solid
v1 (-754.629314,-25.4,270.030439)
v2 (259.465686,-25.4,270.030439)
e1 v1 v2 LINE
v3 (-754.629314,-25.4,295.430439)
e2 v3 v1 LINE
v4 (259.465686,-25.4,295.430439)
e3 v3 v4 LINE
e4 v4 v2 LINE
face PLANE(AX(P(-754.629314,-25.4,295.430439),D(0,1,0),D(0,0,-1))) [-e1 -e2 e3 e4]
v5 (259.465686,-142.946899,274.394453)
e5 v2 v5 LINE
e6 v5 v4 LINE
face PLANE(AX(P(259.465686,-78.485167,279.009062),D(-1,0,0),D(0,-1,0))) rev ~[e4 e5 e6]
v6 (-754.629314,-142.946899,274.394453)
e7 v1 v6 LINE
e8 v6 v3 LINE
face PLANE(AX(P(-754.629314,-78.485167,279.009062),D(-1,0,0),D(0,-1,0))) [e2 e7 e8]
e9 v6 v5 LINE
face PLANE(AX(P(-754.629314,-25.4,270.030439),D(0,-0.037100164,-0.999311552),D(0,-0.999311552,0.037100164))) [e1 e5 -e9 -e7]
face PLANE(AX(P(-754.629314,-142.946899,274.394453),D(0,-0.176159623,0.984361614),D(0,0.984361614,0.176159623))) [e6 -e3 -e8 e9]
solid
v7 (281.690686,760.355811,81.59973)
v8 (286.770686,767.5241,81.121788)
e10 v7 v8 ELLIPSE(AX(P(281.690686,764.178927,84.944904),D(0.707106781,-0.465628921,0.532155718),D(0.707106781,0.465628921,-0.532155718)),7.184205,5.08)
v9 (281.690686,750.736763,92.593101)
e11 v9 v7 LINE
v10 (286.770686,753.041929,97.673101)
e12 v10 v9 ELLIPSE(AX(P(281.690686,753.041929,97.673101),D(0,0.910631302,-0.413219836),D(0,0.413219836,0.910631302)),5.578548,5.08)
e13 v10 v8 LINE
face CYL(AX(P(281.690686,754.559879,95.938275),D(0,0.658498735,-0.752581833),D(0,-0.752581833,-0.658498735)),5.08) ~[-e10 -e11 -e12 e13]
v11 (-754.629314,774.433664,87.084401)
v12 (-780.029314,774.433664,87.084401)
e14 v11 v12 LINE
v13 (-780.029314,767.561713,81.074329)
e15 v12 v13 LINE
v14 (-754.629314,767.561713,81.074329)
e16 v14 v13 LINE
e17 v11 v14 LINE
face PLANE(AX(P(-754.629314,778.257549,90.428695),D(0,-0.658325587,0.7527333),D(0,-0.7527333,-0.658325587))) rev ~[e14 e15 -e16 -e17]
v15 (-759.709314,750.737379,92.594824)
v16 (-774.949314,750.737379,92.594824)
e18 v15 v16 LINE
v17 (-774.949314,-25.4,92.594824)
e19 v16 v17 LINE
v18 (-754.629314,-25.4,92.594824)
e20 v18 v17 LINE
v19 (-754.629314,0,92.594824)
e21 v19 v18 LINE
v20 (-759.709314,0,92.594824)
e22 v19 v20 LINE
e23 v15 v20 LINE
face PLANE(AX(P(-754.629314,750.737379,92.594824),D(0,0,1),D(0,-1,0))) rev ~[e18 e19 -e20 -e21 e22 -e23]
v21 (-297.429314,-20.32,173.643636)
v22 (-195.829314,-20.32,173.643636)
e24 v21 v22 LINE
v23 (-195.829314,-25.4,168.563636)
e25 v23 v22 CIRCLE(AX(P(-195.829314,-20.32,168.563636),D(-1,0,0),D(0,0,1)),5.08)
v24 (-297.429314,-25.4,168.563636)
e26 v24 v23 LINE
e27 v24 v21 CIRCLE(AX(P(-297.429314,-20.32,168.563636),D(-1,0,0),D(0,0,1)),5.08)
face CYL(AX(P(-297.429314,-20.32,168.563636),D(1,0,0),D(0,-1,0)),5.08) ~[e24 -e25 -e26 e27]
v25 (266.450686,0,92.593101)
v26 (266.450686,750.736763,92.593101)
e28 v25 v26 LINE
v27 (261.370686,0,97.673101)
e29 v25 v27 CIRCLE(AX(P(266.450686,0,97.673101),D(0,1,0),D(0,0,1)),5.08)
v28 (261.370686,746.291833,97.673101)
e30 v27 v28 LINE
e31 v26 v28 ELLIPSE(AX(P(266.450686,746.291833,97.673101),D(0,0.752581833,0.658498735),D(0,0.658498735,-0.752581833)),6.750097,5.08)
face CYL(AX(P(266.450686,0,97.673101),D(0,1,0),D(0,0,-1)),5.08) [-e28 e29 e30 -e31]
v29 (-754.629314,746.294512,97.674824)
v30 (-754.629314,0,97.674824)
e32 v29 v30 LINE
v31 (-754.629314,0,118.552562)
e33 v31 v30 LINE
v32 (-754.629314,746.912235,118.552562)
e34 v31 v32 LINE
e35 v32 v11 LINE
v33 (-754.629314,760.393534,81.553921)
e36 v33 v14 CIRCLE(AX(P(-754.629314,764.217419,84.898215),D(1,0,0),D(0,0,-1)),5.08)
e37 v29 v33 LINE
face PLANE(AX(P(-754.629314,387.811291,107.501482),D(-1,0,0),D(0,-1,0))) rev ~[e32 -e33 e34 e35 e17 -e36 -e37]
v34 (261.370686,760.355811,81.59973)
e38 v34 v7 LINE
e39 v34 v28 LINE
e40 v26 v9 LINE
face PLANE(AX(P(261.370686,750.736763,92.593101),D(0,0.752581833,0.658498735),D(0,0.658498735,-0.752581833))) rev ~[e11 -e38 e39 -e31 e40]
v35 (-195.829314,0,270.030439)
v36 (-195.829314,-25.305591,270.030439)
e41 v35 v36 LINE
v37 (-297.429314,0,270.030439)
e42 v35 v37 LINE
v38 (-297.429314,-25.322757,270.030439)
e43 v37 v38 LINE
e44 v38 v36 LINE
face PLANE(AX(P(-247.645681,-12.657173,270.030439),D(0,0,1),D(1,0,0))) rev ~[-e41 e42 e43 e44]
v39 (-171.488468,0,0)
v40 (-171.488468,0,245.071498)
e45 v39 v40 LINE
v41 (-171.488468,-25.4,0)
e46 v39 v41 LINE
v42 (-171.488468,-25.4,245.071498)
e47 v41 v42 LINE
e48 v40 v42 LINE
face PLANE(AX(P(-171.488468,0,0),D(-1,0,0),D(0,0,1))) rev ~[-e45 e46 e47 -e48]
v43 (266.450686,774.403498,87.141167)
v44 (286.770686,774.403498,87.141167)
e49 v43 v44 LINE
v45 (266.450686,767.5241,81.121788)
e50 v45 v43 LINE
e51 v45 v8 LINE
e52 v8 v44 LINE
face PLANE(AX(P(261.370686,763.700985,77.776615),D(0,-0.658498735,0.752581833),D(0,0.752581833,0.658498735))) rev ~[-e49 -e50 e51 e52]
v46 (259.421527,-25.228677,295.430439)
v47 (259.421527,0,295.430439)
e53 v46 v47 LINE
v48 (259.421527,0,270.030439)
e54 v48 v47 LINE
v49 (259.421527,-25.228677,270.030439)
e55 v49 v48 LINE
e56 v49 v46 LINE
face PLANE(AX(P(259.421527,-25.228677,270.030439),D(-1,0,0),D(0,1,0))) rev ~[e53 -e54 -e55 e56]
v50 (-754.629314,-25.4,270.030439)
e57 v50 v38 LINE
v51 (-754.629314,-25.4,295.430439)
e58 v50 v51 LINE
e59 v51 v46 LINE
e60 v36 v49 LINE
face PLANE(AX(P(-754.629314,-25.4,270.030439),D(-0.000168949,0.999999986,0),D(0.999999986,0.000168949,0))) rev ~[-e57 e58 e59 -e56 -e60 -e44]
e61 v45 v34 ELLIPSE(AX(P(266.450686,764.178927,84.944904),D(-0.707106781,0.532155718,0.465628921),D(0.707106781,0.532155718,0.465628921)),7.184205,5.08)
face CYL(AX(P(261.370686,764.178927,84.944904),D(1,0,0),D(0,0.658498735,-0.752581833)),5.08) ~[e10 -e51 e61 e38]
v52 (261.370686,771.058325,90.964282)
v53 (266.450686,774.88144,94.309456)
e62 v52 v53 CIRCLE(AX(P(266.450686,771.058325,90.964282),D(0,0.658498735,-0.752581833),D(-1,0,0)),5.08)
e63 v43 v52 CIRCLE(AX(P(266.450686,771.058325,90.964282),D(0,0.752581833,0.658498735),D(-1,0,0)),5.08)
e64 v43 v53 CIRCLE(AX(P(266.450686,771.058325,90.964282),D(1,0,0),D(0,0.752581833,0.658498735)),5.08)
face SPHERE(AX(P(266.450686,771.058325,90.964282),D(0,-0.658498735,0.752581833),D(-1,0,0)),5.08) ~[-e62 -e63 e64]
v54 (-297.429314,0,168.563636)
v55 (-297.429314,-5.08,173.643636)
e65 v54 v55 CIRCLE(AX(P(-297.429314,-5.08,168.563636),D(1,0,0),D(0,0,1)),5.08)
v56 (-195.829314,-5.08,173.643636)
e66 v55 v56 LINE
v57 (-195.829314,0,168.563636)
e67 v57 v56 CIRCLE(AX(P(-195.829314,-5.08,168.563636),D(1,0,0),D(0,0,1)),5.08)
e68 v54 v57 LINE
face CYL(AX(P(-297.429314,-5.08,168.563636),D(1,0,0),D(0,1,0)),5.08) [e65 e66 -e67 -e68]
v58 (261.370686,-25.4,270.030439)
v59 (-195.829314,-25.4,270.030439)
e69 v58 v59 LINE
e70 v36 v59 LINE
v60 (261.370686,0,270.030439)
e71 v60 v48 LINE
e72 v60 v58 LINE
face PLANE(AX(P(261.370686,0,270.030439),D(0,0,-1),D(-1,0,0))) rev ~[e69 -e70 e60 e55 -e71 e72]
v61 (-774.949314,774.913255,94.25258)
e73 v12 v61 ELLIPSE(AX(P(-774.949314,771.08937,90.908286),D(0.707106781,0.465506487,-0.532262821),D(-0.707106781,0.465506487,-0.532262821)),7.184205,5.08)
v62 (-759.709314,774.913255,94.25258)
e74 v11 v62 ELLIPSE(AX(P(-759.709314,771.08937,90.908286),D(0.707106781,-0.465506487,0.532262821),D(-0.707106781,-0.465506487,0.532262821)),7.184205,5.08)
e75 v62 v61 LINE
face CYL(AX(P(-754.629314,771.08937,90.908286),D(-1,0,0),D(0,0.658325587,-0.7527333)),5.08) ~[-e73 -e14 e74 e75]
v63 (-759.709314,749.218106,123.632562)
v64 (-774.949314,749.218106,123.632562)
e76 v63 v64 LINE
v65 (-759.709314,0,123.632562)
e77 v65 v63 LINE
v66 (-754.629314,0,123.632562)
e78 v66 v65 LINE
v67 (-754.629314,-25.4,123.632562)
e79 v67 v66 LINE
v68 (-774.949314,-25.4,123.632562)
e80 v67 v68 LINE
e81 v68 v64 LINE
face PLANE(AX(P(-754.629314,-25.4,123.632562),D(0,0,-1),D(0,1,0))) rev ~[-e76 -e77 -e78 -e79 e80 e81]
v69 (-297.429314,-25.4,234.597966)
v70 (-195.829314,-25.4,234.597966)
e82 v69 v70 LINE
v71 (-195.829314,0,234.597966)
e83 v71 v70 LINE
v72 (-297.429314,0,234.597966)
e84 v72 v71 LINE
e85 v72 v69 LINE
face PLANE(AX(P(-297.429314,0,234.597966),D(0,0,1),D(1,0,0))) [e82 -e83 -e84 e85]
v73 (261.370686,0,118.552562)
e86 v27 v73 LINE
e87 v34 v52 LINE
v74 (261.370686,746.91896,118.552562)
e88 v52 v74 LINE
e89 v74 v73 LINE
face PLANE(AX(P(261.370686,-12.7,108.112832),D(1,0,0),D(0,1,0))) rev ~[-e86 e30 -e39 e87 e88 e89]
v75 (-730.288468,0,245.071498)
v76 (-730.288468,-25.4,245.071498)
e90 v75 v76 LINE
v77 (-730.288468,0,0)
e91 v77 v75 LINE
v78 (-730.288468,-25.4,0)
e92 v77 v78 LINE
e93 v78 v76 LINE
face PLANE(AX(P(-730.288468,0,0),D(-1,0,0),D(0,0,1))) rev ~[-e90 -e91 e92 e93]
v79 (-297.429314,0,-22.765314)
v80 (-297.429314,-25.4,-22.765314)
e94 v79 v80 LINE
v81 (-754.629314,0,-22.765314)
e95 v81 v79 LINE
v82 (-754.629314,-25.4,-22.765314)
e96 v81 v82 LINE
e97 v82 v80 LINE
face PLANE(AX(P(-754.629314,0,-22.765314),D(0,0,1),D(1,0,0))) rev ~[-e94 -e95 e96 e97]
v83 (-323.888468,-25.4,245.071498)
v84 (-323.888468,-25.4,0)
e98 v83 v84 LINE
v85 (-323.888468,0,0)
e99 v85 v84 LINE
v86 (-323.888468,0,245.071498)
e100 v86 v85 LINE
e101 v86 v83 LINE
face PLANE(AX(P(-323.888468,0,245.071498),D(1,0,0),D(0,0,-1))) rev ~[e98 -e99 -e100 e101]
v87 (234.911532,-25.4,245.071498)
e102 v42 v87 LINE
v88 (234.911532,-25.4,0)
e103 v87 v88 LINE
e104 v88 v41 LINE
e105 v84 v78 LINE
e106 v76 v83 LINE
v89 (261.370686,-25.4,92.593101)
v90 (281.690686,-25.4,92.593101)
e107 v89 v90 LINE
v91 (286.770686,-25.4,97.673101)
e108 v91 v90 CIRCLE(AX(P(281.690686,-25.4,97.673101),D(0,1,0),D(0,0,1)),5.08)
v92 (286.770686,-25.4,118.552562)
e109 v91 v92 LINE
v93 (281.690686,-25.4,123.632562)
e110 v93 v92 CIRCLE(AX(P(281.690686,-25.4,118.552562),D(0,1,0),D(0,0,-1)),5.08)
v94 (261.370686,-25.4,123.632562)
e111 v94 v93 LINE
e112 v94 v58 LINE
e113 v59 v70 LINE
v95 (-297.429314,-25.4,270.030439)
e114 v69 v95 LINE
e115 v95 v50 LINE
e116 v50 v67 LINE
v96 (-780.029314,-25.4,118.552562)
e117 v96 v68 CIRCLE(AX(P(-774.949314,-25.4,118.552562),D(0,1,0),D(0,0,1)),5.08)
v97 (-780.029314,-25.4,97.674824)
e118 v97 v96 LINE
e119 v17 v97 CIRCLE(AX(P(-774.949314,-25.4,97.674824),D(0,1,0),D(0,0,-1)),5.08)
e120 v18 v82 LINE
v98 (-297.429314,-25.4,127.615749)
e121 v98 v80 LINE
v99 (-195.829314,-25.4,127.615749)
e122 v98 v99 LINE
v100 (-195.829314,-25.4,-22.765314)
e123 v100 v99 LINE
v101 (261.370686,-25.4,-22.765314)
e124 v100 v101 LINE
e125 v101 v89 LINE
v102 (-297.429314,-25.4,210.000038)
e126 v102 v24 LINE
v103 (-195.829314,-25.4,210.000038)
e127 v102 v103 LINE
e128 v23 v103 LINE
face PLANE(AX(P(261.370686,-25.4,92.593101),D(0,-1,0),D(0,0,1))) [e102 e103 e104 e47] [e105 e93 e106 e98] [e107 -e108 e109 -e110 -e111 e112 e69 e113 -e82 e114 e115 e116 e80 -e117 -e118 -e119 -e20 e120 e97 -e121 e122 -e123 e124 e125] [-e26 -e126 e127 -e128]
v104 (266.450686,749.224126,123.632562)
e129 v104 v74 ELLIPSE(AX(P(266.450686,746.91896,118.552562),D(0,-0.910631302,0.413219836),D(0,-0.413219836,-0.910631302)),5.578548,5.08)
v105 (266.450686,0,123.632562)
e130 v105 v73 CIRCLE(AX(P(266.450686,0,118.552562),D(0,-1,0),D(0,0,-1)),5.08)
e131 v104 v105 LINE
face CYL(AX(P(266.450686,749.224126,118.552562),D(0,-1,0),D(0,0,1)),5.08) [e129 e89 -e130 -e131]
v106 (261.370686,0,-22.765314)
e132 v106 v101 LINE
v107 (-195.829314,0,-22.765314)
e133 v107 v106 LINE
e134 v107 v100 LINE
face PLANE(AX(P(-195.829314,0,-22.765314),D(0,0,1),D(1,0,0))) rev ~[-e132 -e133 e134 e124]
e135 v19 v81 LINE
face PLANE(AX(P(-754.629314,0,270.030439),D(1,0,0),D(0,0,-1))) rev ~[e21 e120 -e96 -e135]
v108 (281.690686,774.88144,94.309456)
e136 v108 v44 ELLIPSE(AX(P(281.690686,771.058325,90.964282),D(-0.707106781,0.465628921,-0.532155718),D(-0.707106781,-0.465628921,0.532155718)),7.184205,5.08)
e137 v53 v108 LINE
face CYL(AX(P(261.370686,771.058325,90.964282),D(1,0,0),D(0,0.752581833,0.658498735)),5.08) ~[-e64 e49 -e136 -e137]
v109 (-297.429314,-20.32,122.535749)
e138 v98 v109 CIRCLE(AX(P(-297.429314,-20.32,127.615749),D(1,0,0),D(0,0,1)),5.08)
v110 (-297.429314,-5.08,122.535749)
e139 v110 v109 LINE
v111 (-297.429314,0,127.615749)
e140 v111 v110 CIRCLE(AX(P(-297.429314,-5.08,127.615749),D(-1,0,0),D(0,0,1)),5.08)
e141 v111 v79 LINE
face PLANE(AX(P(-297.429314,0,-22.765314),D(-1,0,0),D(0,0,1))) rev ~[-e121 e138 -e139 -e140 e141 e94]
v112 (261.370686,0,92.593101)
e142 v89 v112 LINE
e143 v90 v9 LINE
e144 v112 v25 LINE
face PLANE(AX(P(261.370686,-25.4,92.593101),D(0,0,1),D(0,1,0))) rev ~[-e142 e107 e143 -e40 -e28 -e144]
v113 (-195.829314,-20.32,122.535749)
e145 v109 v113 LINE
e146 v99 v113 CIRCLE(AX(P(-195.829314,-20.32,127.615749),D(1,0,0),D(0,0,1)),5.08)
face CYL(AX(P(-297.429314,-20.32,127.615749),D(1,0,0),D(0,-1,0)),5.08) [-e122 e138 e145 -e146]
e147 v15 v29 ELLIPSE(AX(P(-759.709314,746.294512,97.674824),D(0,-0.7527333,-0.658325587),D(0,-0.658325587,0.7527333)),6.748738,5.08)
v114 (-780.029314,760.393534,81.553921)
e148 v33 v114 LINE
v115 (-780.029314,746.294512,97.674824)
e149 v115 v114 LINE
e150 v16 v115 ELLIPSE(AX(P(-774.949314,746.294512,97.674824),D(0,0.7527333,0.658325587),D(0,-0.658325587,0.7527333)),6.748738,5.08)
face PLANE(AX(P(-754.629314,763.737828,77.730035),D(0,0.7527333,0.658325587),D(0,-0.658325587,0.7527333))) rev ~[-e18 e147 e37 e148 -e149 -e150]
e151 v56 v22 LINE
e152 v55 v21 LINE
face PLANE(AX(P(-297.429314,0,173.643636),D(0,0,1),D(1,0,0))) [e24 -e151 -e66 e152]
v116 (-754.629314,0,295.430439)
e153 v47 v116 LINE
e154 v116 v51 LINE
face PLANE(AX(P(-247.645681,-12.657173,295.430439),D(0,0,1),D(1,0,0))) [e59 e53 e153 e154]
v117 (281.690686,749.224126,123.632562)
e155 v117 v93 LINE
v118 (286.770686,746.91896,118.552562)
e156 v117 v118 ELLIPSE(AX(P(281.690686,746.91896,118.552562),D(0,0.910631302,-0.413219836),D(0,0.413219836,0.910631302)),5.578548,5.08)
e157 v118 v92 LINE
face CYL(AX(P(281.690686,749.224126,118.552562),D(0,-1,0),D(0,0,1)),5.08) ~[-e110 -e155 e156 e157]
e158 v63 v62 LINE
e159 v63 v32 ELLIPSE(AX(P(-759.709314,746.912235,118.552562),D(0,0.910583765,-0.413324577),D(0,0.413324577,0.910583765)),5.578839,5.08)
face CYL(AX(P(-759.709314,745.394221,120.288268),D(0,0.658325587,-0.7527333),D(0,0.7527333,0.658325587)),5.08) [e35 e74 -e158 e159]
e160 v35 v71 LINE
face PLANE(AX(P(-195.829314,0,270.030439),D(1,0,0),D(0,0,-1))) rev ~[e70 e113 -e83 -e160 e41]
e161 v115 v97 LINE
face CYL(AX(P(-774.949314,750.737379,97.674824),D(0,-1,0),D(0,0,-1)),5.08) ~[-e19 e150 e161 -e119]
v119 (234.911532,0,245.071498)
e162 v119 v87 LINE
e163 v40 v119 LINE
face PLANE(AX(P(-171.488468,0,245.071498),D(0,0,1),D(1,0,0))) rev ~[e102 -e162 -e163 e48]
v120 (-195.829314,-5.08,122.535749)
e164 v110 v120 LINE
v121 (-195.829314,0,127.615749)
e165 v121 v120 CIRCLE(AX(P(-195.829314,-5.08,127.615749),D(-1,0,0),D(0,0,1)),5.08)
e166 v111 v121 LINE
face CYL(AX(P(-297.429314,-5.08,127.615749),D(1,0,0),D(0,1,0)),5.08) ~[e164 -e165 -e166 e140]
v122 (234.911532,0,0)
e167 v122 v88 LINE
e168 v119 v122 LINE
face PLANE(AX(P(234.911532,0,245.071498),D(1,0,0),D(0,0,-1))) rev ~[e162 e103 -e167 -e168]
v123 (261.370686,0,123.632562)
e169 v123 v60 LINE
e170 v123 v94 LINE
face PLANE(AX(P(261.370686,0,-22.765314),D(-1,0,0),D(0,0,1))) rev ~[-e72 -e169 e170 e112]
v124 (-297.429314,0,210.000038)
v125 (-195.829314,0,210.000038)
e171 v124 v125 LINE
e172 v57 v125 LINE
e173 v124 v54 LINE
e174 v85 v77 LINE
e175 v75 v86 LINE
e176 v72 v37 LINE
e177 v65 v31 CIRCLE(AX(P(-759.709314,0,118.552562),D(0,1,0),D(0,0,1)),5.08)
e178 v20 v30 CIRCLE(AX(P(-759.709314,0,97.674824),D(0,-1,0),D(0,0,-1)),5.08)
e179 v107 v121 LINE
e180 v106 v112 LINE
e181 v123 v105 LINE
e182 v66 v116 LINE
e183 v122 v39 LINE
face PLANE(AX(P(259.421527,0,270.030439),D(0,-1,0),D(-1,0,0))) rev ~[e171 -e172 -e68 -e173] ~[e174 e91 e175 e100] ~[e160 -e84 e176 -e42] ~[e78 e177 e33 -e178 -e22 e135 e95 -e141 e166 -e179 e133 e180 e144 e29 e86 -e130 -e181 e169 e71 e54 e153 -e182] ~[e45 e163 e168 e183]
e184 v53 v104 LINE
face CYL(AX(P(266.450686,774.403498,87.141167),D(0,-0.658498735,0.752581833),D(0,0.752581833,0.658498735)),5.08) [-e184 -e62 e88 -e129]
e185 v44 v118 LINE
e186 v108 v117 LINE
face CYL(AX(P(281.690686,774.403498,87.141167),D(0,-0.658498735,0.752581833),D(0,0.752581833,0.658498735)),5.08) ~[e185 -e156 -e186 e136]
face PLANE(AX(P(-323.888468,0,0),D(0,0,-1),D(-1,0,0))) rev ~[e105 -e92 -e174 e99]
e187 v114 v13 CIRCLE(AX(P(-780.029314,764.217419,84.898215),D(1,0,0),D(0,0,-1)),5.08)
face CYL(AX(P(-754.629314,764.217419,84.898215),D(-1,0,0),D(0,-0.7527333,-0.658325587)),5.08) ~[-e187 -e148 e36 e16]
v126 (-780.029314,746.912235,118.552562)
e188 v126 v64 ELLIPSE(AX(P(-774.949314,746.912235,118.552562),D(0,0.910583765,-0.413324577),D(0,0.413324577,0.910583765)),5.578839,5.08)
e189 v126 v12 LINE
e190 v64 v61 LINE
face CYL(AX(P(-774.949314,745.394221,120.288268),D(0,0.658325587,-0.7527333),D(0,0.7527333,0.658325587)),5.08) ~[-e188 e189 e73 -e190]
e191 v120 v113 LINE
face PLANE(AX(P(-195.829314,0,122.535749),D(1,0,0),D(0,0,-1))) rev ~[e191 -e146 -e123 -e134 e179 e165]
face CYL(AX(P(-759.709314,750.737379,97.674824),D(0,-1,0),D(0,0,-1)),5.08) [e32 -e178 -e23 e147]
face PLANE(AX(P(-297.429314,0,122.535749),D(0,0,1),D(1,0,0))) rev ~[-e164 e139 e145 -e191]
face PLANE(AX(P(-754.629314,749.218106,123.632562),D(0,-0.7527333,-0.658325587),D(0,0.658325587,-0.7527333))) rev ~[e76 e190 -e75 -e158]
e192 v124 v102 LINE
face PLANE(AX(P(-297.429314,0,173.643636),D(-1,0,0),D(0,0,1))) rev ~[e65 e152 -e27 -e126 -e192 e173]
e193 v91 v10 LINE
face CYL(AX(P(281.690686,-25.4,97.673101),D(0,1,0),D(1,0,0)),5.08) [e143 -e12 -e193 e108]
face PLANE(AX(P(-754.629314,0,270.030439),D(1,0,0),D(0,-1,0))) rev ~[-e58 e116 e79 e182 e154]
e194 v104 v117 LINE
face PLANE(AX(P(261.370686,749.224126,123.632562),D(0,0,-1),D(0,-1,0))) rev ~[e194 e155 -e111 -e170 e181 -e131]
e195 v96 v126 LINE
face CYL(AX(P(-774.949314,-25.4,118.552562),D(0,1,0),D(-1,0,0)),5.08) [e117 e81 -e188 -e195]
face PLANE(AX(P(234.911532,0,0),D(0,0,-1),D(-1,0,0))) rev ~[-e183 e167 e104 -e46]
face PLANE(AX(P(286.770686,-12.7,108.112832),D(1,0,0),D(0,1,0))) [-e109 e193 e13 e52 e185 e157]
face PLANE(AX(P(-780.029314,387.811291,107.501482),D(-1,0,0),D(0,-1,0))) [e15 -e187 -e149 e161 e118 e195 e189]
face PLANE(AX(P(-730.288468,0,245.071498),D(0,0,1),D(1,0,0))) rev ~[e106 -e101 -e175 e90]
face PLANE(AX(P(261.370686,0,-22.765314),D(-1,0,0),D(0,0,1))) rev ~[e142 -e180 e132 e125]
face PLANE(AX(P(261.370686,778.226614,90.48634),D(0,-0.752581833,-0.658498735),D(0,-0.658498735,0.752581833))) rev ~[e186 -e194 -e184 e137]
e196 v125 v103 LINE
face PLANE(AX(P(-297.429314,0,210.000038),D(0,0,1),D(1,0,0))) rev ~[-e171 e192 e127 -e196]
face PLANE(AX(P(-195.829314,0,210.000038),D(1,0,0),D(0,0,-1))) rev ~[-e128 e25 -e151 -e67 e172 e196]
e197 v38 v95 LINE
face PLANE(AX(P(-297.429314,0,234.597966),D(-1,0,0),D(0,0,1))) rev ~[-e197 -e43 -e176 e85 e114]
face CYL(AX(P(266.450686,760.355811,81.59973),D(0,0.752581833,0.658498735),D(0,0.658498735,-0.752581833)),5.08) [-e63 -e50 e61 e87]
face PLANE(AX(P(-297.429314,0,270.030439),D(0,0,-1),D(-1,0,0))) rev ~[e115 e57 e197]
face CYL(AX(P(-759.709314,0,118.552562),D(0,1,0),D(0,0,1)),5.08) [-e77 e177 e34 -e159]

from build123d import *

# Parameters (mm, degrees)
F0_W     = 26.4591541143
F0_H     = 51.1078872686
F0_W_2   = 101.6
F0_W_3   = 24.3408458857
F0_H_2   = 24.597927928
F1_DEPTH = 25.4
F2_W     = 25.4
F2_H     = 31.037738815
F3_DEPTH = 25.4
F4_W     = 25.4
F4_H     = 31.0394611481
F5_DEPTH = 25.4
F7_DEPTH = 25.4
F9_DEPTH = 1014.095
F10_R    = 5.08
F11_R    = 5.08


# Not quite as in the source:
# - two fillets or chamfers of one size are made in one step


with BuildPart() as f1:
    # F0 (on Front) → F1 (new body)
    with BuildSketch(Plane.XZ):
        Polygon((-730.28846806, 0), (-730.28846806, 245.0714976708), (-323.88846806, 245.0714976708), (-323.88846806, 173.643636104), (-297.4293139458, 173.643636104), (-297.4293139458, 210.000038147), (-297.4293139458, 234.5979660749), (-297.4293139458, 270.0304389), (-754.6293139458, 270.0304389), (-754.6293139458, -22.7653142065), (-297.4293139458, -22.7653142065), (-297.4293139458, 122.5357488354), (-323.88846806, 122.5357488354), (-323.88846806, 0), align=None)
        with Locations((-310.6588910029, 148.0896924697)):
            Rectangle(F0_W, F0_H)
        with Locations((-246.6293139458, 148.0896924697)):
            Rectangle(F0_W_2, F0_H)
        Polygon((-195.8293139458, 210.000038147), (-195.8293139458, 173.643636104), (-171.48846806, 173.643636104), (-171.48846806, 245.0714976708), (234.91153194, 245.0714976708), (234.91153194, 0), (-171.48846806, 0), (-171.48846806, 122.5357488354), (-195.8293139458, 122.5357488354), (-195.8293139458, -22.7653142065), (261.3706860542, -22.7653142065), (261.3706860542, 270.0304389), (-195.8293139458, 270.0304389), (-195.8293139458, 234.5979660749), align=None)
        with Locations((-183.6588910029, 148.0896924697)):
            Rectangle(F0_W_3, F0_H)
        with Locations((-246.6293139458, 222.299002111)):
            Rectangle(F0_W_2, F0_H_2)
    extrude(amount=F1_DEPTH)

    # F2 (on face) → F3 (join)
    with BuildSketch(Plane(origin=(-754.6293139458, 0, 0), x_dir=(0, -1, 0), z_dir=(-1, 0, 0))):
        Polygon((0, 92.5948235318), (0, 123.6325623468), (-749.2181062698, 123.6325623468), (-778.2575488091, 90.4286950827), (-763.7378275394, 77.7300353711), (-750.7373791816, 92.5948235318), align=None)
        with Locations((12.7, 108.1136929393)):
            Rectangle(F2_W, F2_H)
    extrude(amount=F3_DEPTH)

    # F4 (on face) → F5 (join)
    with BuildSketch(Plane.YZ.offset(261.3706860542)):
        with Locations((-12.7, 108.1128317727)):
            Rectangle(F4_W, F4_H)
        Polygon((749.224126339, 123.6325623468), (0, 123.6325623468), (0, 92.5931011987), (750.7367628879, 92.5931011987), (763.7009845333, 77.7766145807), (778.2266139984, 90.4863402247), align=None)
    extrude(amount=F5_DEPTH)

    # F6 (on face) → F7 (join)
    with BuildSketch(Plane.XY.offset(270.0304389)):
        Polygon((259.4215273857, 0), (-754.6293139458, 0), (-754.6293139458, -25.4), (259.4215273857, -25.2286773175), align=None)
    extrude(amount=F7_DEPTH)

    # F10
    f10_edges = [f1.edges().sort_by_distance(p)[0] for p in [
        (-246.629314, -25.4, 173.643636),
        (-246.629314, -25.4, 122.535749),
        (-246.629314, 0, 173.643636),
        (-246.629314, 0, 122.535749),
    ]]
    fillet(f10_edges, radius=F10_R)

    # F11
    f11_edges = [f1.edges().sort_by_distance(p)[0] for p in [
        (-754.629314, 374.609053, 123.632562),
        (-780.029314, 361.909053, 123.632562),
        (-780.029314, 362.66869, 92.594824),
        (-754.629314, 375.36869, 92.594824),
        (-767.329314, 778.257549, 90.428695),
        (-780.029314, 763.737828, 107.030629),
        (-767.329314, 763.737828, 77.730035),
        (-754.629314, 763.737828, 107.030629),
        (261.370686, 375.368381, 92.593101),
        (286.770686, 362.668381, 92.593101),
        (286.770686, 757.218874, 85.184858),
        (286.770686, 763.72537, 107.059451),
        (286.770686, 361.912063, 123.632562),
        (261.370686, 374.612063, 123.632562),
        (274.070686, 763.700985, 77.776615),
        (261.370686, 763.72537, 107.059451),
        (261.370686, 770.963799, 84.131477),
        (274.070686, 778.226614, 90.48634),
    ]]
    fillet(f11_edges, radius=F11_R)


with BuildPart() as f9:
    # F8 (on face) → F9 (new body)
    with BuildSketch(Plane(origin=(-754.6293139458, 0, 0), x_dir=(0, -1, 0), z_dir=(-1, 0, 0))):
        Polygon((142.9468989372, 274.3944525719), (25.4, 295.4304389), (25.4, 270.0304389), align=None)
    extrude(amount=-F9_DEPTH)


solid = Compound([f1.part, f9.part])
